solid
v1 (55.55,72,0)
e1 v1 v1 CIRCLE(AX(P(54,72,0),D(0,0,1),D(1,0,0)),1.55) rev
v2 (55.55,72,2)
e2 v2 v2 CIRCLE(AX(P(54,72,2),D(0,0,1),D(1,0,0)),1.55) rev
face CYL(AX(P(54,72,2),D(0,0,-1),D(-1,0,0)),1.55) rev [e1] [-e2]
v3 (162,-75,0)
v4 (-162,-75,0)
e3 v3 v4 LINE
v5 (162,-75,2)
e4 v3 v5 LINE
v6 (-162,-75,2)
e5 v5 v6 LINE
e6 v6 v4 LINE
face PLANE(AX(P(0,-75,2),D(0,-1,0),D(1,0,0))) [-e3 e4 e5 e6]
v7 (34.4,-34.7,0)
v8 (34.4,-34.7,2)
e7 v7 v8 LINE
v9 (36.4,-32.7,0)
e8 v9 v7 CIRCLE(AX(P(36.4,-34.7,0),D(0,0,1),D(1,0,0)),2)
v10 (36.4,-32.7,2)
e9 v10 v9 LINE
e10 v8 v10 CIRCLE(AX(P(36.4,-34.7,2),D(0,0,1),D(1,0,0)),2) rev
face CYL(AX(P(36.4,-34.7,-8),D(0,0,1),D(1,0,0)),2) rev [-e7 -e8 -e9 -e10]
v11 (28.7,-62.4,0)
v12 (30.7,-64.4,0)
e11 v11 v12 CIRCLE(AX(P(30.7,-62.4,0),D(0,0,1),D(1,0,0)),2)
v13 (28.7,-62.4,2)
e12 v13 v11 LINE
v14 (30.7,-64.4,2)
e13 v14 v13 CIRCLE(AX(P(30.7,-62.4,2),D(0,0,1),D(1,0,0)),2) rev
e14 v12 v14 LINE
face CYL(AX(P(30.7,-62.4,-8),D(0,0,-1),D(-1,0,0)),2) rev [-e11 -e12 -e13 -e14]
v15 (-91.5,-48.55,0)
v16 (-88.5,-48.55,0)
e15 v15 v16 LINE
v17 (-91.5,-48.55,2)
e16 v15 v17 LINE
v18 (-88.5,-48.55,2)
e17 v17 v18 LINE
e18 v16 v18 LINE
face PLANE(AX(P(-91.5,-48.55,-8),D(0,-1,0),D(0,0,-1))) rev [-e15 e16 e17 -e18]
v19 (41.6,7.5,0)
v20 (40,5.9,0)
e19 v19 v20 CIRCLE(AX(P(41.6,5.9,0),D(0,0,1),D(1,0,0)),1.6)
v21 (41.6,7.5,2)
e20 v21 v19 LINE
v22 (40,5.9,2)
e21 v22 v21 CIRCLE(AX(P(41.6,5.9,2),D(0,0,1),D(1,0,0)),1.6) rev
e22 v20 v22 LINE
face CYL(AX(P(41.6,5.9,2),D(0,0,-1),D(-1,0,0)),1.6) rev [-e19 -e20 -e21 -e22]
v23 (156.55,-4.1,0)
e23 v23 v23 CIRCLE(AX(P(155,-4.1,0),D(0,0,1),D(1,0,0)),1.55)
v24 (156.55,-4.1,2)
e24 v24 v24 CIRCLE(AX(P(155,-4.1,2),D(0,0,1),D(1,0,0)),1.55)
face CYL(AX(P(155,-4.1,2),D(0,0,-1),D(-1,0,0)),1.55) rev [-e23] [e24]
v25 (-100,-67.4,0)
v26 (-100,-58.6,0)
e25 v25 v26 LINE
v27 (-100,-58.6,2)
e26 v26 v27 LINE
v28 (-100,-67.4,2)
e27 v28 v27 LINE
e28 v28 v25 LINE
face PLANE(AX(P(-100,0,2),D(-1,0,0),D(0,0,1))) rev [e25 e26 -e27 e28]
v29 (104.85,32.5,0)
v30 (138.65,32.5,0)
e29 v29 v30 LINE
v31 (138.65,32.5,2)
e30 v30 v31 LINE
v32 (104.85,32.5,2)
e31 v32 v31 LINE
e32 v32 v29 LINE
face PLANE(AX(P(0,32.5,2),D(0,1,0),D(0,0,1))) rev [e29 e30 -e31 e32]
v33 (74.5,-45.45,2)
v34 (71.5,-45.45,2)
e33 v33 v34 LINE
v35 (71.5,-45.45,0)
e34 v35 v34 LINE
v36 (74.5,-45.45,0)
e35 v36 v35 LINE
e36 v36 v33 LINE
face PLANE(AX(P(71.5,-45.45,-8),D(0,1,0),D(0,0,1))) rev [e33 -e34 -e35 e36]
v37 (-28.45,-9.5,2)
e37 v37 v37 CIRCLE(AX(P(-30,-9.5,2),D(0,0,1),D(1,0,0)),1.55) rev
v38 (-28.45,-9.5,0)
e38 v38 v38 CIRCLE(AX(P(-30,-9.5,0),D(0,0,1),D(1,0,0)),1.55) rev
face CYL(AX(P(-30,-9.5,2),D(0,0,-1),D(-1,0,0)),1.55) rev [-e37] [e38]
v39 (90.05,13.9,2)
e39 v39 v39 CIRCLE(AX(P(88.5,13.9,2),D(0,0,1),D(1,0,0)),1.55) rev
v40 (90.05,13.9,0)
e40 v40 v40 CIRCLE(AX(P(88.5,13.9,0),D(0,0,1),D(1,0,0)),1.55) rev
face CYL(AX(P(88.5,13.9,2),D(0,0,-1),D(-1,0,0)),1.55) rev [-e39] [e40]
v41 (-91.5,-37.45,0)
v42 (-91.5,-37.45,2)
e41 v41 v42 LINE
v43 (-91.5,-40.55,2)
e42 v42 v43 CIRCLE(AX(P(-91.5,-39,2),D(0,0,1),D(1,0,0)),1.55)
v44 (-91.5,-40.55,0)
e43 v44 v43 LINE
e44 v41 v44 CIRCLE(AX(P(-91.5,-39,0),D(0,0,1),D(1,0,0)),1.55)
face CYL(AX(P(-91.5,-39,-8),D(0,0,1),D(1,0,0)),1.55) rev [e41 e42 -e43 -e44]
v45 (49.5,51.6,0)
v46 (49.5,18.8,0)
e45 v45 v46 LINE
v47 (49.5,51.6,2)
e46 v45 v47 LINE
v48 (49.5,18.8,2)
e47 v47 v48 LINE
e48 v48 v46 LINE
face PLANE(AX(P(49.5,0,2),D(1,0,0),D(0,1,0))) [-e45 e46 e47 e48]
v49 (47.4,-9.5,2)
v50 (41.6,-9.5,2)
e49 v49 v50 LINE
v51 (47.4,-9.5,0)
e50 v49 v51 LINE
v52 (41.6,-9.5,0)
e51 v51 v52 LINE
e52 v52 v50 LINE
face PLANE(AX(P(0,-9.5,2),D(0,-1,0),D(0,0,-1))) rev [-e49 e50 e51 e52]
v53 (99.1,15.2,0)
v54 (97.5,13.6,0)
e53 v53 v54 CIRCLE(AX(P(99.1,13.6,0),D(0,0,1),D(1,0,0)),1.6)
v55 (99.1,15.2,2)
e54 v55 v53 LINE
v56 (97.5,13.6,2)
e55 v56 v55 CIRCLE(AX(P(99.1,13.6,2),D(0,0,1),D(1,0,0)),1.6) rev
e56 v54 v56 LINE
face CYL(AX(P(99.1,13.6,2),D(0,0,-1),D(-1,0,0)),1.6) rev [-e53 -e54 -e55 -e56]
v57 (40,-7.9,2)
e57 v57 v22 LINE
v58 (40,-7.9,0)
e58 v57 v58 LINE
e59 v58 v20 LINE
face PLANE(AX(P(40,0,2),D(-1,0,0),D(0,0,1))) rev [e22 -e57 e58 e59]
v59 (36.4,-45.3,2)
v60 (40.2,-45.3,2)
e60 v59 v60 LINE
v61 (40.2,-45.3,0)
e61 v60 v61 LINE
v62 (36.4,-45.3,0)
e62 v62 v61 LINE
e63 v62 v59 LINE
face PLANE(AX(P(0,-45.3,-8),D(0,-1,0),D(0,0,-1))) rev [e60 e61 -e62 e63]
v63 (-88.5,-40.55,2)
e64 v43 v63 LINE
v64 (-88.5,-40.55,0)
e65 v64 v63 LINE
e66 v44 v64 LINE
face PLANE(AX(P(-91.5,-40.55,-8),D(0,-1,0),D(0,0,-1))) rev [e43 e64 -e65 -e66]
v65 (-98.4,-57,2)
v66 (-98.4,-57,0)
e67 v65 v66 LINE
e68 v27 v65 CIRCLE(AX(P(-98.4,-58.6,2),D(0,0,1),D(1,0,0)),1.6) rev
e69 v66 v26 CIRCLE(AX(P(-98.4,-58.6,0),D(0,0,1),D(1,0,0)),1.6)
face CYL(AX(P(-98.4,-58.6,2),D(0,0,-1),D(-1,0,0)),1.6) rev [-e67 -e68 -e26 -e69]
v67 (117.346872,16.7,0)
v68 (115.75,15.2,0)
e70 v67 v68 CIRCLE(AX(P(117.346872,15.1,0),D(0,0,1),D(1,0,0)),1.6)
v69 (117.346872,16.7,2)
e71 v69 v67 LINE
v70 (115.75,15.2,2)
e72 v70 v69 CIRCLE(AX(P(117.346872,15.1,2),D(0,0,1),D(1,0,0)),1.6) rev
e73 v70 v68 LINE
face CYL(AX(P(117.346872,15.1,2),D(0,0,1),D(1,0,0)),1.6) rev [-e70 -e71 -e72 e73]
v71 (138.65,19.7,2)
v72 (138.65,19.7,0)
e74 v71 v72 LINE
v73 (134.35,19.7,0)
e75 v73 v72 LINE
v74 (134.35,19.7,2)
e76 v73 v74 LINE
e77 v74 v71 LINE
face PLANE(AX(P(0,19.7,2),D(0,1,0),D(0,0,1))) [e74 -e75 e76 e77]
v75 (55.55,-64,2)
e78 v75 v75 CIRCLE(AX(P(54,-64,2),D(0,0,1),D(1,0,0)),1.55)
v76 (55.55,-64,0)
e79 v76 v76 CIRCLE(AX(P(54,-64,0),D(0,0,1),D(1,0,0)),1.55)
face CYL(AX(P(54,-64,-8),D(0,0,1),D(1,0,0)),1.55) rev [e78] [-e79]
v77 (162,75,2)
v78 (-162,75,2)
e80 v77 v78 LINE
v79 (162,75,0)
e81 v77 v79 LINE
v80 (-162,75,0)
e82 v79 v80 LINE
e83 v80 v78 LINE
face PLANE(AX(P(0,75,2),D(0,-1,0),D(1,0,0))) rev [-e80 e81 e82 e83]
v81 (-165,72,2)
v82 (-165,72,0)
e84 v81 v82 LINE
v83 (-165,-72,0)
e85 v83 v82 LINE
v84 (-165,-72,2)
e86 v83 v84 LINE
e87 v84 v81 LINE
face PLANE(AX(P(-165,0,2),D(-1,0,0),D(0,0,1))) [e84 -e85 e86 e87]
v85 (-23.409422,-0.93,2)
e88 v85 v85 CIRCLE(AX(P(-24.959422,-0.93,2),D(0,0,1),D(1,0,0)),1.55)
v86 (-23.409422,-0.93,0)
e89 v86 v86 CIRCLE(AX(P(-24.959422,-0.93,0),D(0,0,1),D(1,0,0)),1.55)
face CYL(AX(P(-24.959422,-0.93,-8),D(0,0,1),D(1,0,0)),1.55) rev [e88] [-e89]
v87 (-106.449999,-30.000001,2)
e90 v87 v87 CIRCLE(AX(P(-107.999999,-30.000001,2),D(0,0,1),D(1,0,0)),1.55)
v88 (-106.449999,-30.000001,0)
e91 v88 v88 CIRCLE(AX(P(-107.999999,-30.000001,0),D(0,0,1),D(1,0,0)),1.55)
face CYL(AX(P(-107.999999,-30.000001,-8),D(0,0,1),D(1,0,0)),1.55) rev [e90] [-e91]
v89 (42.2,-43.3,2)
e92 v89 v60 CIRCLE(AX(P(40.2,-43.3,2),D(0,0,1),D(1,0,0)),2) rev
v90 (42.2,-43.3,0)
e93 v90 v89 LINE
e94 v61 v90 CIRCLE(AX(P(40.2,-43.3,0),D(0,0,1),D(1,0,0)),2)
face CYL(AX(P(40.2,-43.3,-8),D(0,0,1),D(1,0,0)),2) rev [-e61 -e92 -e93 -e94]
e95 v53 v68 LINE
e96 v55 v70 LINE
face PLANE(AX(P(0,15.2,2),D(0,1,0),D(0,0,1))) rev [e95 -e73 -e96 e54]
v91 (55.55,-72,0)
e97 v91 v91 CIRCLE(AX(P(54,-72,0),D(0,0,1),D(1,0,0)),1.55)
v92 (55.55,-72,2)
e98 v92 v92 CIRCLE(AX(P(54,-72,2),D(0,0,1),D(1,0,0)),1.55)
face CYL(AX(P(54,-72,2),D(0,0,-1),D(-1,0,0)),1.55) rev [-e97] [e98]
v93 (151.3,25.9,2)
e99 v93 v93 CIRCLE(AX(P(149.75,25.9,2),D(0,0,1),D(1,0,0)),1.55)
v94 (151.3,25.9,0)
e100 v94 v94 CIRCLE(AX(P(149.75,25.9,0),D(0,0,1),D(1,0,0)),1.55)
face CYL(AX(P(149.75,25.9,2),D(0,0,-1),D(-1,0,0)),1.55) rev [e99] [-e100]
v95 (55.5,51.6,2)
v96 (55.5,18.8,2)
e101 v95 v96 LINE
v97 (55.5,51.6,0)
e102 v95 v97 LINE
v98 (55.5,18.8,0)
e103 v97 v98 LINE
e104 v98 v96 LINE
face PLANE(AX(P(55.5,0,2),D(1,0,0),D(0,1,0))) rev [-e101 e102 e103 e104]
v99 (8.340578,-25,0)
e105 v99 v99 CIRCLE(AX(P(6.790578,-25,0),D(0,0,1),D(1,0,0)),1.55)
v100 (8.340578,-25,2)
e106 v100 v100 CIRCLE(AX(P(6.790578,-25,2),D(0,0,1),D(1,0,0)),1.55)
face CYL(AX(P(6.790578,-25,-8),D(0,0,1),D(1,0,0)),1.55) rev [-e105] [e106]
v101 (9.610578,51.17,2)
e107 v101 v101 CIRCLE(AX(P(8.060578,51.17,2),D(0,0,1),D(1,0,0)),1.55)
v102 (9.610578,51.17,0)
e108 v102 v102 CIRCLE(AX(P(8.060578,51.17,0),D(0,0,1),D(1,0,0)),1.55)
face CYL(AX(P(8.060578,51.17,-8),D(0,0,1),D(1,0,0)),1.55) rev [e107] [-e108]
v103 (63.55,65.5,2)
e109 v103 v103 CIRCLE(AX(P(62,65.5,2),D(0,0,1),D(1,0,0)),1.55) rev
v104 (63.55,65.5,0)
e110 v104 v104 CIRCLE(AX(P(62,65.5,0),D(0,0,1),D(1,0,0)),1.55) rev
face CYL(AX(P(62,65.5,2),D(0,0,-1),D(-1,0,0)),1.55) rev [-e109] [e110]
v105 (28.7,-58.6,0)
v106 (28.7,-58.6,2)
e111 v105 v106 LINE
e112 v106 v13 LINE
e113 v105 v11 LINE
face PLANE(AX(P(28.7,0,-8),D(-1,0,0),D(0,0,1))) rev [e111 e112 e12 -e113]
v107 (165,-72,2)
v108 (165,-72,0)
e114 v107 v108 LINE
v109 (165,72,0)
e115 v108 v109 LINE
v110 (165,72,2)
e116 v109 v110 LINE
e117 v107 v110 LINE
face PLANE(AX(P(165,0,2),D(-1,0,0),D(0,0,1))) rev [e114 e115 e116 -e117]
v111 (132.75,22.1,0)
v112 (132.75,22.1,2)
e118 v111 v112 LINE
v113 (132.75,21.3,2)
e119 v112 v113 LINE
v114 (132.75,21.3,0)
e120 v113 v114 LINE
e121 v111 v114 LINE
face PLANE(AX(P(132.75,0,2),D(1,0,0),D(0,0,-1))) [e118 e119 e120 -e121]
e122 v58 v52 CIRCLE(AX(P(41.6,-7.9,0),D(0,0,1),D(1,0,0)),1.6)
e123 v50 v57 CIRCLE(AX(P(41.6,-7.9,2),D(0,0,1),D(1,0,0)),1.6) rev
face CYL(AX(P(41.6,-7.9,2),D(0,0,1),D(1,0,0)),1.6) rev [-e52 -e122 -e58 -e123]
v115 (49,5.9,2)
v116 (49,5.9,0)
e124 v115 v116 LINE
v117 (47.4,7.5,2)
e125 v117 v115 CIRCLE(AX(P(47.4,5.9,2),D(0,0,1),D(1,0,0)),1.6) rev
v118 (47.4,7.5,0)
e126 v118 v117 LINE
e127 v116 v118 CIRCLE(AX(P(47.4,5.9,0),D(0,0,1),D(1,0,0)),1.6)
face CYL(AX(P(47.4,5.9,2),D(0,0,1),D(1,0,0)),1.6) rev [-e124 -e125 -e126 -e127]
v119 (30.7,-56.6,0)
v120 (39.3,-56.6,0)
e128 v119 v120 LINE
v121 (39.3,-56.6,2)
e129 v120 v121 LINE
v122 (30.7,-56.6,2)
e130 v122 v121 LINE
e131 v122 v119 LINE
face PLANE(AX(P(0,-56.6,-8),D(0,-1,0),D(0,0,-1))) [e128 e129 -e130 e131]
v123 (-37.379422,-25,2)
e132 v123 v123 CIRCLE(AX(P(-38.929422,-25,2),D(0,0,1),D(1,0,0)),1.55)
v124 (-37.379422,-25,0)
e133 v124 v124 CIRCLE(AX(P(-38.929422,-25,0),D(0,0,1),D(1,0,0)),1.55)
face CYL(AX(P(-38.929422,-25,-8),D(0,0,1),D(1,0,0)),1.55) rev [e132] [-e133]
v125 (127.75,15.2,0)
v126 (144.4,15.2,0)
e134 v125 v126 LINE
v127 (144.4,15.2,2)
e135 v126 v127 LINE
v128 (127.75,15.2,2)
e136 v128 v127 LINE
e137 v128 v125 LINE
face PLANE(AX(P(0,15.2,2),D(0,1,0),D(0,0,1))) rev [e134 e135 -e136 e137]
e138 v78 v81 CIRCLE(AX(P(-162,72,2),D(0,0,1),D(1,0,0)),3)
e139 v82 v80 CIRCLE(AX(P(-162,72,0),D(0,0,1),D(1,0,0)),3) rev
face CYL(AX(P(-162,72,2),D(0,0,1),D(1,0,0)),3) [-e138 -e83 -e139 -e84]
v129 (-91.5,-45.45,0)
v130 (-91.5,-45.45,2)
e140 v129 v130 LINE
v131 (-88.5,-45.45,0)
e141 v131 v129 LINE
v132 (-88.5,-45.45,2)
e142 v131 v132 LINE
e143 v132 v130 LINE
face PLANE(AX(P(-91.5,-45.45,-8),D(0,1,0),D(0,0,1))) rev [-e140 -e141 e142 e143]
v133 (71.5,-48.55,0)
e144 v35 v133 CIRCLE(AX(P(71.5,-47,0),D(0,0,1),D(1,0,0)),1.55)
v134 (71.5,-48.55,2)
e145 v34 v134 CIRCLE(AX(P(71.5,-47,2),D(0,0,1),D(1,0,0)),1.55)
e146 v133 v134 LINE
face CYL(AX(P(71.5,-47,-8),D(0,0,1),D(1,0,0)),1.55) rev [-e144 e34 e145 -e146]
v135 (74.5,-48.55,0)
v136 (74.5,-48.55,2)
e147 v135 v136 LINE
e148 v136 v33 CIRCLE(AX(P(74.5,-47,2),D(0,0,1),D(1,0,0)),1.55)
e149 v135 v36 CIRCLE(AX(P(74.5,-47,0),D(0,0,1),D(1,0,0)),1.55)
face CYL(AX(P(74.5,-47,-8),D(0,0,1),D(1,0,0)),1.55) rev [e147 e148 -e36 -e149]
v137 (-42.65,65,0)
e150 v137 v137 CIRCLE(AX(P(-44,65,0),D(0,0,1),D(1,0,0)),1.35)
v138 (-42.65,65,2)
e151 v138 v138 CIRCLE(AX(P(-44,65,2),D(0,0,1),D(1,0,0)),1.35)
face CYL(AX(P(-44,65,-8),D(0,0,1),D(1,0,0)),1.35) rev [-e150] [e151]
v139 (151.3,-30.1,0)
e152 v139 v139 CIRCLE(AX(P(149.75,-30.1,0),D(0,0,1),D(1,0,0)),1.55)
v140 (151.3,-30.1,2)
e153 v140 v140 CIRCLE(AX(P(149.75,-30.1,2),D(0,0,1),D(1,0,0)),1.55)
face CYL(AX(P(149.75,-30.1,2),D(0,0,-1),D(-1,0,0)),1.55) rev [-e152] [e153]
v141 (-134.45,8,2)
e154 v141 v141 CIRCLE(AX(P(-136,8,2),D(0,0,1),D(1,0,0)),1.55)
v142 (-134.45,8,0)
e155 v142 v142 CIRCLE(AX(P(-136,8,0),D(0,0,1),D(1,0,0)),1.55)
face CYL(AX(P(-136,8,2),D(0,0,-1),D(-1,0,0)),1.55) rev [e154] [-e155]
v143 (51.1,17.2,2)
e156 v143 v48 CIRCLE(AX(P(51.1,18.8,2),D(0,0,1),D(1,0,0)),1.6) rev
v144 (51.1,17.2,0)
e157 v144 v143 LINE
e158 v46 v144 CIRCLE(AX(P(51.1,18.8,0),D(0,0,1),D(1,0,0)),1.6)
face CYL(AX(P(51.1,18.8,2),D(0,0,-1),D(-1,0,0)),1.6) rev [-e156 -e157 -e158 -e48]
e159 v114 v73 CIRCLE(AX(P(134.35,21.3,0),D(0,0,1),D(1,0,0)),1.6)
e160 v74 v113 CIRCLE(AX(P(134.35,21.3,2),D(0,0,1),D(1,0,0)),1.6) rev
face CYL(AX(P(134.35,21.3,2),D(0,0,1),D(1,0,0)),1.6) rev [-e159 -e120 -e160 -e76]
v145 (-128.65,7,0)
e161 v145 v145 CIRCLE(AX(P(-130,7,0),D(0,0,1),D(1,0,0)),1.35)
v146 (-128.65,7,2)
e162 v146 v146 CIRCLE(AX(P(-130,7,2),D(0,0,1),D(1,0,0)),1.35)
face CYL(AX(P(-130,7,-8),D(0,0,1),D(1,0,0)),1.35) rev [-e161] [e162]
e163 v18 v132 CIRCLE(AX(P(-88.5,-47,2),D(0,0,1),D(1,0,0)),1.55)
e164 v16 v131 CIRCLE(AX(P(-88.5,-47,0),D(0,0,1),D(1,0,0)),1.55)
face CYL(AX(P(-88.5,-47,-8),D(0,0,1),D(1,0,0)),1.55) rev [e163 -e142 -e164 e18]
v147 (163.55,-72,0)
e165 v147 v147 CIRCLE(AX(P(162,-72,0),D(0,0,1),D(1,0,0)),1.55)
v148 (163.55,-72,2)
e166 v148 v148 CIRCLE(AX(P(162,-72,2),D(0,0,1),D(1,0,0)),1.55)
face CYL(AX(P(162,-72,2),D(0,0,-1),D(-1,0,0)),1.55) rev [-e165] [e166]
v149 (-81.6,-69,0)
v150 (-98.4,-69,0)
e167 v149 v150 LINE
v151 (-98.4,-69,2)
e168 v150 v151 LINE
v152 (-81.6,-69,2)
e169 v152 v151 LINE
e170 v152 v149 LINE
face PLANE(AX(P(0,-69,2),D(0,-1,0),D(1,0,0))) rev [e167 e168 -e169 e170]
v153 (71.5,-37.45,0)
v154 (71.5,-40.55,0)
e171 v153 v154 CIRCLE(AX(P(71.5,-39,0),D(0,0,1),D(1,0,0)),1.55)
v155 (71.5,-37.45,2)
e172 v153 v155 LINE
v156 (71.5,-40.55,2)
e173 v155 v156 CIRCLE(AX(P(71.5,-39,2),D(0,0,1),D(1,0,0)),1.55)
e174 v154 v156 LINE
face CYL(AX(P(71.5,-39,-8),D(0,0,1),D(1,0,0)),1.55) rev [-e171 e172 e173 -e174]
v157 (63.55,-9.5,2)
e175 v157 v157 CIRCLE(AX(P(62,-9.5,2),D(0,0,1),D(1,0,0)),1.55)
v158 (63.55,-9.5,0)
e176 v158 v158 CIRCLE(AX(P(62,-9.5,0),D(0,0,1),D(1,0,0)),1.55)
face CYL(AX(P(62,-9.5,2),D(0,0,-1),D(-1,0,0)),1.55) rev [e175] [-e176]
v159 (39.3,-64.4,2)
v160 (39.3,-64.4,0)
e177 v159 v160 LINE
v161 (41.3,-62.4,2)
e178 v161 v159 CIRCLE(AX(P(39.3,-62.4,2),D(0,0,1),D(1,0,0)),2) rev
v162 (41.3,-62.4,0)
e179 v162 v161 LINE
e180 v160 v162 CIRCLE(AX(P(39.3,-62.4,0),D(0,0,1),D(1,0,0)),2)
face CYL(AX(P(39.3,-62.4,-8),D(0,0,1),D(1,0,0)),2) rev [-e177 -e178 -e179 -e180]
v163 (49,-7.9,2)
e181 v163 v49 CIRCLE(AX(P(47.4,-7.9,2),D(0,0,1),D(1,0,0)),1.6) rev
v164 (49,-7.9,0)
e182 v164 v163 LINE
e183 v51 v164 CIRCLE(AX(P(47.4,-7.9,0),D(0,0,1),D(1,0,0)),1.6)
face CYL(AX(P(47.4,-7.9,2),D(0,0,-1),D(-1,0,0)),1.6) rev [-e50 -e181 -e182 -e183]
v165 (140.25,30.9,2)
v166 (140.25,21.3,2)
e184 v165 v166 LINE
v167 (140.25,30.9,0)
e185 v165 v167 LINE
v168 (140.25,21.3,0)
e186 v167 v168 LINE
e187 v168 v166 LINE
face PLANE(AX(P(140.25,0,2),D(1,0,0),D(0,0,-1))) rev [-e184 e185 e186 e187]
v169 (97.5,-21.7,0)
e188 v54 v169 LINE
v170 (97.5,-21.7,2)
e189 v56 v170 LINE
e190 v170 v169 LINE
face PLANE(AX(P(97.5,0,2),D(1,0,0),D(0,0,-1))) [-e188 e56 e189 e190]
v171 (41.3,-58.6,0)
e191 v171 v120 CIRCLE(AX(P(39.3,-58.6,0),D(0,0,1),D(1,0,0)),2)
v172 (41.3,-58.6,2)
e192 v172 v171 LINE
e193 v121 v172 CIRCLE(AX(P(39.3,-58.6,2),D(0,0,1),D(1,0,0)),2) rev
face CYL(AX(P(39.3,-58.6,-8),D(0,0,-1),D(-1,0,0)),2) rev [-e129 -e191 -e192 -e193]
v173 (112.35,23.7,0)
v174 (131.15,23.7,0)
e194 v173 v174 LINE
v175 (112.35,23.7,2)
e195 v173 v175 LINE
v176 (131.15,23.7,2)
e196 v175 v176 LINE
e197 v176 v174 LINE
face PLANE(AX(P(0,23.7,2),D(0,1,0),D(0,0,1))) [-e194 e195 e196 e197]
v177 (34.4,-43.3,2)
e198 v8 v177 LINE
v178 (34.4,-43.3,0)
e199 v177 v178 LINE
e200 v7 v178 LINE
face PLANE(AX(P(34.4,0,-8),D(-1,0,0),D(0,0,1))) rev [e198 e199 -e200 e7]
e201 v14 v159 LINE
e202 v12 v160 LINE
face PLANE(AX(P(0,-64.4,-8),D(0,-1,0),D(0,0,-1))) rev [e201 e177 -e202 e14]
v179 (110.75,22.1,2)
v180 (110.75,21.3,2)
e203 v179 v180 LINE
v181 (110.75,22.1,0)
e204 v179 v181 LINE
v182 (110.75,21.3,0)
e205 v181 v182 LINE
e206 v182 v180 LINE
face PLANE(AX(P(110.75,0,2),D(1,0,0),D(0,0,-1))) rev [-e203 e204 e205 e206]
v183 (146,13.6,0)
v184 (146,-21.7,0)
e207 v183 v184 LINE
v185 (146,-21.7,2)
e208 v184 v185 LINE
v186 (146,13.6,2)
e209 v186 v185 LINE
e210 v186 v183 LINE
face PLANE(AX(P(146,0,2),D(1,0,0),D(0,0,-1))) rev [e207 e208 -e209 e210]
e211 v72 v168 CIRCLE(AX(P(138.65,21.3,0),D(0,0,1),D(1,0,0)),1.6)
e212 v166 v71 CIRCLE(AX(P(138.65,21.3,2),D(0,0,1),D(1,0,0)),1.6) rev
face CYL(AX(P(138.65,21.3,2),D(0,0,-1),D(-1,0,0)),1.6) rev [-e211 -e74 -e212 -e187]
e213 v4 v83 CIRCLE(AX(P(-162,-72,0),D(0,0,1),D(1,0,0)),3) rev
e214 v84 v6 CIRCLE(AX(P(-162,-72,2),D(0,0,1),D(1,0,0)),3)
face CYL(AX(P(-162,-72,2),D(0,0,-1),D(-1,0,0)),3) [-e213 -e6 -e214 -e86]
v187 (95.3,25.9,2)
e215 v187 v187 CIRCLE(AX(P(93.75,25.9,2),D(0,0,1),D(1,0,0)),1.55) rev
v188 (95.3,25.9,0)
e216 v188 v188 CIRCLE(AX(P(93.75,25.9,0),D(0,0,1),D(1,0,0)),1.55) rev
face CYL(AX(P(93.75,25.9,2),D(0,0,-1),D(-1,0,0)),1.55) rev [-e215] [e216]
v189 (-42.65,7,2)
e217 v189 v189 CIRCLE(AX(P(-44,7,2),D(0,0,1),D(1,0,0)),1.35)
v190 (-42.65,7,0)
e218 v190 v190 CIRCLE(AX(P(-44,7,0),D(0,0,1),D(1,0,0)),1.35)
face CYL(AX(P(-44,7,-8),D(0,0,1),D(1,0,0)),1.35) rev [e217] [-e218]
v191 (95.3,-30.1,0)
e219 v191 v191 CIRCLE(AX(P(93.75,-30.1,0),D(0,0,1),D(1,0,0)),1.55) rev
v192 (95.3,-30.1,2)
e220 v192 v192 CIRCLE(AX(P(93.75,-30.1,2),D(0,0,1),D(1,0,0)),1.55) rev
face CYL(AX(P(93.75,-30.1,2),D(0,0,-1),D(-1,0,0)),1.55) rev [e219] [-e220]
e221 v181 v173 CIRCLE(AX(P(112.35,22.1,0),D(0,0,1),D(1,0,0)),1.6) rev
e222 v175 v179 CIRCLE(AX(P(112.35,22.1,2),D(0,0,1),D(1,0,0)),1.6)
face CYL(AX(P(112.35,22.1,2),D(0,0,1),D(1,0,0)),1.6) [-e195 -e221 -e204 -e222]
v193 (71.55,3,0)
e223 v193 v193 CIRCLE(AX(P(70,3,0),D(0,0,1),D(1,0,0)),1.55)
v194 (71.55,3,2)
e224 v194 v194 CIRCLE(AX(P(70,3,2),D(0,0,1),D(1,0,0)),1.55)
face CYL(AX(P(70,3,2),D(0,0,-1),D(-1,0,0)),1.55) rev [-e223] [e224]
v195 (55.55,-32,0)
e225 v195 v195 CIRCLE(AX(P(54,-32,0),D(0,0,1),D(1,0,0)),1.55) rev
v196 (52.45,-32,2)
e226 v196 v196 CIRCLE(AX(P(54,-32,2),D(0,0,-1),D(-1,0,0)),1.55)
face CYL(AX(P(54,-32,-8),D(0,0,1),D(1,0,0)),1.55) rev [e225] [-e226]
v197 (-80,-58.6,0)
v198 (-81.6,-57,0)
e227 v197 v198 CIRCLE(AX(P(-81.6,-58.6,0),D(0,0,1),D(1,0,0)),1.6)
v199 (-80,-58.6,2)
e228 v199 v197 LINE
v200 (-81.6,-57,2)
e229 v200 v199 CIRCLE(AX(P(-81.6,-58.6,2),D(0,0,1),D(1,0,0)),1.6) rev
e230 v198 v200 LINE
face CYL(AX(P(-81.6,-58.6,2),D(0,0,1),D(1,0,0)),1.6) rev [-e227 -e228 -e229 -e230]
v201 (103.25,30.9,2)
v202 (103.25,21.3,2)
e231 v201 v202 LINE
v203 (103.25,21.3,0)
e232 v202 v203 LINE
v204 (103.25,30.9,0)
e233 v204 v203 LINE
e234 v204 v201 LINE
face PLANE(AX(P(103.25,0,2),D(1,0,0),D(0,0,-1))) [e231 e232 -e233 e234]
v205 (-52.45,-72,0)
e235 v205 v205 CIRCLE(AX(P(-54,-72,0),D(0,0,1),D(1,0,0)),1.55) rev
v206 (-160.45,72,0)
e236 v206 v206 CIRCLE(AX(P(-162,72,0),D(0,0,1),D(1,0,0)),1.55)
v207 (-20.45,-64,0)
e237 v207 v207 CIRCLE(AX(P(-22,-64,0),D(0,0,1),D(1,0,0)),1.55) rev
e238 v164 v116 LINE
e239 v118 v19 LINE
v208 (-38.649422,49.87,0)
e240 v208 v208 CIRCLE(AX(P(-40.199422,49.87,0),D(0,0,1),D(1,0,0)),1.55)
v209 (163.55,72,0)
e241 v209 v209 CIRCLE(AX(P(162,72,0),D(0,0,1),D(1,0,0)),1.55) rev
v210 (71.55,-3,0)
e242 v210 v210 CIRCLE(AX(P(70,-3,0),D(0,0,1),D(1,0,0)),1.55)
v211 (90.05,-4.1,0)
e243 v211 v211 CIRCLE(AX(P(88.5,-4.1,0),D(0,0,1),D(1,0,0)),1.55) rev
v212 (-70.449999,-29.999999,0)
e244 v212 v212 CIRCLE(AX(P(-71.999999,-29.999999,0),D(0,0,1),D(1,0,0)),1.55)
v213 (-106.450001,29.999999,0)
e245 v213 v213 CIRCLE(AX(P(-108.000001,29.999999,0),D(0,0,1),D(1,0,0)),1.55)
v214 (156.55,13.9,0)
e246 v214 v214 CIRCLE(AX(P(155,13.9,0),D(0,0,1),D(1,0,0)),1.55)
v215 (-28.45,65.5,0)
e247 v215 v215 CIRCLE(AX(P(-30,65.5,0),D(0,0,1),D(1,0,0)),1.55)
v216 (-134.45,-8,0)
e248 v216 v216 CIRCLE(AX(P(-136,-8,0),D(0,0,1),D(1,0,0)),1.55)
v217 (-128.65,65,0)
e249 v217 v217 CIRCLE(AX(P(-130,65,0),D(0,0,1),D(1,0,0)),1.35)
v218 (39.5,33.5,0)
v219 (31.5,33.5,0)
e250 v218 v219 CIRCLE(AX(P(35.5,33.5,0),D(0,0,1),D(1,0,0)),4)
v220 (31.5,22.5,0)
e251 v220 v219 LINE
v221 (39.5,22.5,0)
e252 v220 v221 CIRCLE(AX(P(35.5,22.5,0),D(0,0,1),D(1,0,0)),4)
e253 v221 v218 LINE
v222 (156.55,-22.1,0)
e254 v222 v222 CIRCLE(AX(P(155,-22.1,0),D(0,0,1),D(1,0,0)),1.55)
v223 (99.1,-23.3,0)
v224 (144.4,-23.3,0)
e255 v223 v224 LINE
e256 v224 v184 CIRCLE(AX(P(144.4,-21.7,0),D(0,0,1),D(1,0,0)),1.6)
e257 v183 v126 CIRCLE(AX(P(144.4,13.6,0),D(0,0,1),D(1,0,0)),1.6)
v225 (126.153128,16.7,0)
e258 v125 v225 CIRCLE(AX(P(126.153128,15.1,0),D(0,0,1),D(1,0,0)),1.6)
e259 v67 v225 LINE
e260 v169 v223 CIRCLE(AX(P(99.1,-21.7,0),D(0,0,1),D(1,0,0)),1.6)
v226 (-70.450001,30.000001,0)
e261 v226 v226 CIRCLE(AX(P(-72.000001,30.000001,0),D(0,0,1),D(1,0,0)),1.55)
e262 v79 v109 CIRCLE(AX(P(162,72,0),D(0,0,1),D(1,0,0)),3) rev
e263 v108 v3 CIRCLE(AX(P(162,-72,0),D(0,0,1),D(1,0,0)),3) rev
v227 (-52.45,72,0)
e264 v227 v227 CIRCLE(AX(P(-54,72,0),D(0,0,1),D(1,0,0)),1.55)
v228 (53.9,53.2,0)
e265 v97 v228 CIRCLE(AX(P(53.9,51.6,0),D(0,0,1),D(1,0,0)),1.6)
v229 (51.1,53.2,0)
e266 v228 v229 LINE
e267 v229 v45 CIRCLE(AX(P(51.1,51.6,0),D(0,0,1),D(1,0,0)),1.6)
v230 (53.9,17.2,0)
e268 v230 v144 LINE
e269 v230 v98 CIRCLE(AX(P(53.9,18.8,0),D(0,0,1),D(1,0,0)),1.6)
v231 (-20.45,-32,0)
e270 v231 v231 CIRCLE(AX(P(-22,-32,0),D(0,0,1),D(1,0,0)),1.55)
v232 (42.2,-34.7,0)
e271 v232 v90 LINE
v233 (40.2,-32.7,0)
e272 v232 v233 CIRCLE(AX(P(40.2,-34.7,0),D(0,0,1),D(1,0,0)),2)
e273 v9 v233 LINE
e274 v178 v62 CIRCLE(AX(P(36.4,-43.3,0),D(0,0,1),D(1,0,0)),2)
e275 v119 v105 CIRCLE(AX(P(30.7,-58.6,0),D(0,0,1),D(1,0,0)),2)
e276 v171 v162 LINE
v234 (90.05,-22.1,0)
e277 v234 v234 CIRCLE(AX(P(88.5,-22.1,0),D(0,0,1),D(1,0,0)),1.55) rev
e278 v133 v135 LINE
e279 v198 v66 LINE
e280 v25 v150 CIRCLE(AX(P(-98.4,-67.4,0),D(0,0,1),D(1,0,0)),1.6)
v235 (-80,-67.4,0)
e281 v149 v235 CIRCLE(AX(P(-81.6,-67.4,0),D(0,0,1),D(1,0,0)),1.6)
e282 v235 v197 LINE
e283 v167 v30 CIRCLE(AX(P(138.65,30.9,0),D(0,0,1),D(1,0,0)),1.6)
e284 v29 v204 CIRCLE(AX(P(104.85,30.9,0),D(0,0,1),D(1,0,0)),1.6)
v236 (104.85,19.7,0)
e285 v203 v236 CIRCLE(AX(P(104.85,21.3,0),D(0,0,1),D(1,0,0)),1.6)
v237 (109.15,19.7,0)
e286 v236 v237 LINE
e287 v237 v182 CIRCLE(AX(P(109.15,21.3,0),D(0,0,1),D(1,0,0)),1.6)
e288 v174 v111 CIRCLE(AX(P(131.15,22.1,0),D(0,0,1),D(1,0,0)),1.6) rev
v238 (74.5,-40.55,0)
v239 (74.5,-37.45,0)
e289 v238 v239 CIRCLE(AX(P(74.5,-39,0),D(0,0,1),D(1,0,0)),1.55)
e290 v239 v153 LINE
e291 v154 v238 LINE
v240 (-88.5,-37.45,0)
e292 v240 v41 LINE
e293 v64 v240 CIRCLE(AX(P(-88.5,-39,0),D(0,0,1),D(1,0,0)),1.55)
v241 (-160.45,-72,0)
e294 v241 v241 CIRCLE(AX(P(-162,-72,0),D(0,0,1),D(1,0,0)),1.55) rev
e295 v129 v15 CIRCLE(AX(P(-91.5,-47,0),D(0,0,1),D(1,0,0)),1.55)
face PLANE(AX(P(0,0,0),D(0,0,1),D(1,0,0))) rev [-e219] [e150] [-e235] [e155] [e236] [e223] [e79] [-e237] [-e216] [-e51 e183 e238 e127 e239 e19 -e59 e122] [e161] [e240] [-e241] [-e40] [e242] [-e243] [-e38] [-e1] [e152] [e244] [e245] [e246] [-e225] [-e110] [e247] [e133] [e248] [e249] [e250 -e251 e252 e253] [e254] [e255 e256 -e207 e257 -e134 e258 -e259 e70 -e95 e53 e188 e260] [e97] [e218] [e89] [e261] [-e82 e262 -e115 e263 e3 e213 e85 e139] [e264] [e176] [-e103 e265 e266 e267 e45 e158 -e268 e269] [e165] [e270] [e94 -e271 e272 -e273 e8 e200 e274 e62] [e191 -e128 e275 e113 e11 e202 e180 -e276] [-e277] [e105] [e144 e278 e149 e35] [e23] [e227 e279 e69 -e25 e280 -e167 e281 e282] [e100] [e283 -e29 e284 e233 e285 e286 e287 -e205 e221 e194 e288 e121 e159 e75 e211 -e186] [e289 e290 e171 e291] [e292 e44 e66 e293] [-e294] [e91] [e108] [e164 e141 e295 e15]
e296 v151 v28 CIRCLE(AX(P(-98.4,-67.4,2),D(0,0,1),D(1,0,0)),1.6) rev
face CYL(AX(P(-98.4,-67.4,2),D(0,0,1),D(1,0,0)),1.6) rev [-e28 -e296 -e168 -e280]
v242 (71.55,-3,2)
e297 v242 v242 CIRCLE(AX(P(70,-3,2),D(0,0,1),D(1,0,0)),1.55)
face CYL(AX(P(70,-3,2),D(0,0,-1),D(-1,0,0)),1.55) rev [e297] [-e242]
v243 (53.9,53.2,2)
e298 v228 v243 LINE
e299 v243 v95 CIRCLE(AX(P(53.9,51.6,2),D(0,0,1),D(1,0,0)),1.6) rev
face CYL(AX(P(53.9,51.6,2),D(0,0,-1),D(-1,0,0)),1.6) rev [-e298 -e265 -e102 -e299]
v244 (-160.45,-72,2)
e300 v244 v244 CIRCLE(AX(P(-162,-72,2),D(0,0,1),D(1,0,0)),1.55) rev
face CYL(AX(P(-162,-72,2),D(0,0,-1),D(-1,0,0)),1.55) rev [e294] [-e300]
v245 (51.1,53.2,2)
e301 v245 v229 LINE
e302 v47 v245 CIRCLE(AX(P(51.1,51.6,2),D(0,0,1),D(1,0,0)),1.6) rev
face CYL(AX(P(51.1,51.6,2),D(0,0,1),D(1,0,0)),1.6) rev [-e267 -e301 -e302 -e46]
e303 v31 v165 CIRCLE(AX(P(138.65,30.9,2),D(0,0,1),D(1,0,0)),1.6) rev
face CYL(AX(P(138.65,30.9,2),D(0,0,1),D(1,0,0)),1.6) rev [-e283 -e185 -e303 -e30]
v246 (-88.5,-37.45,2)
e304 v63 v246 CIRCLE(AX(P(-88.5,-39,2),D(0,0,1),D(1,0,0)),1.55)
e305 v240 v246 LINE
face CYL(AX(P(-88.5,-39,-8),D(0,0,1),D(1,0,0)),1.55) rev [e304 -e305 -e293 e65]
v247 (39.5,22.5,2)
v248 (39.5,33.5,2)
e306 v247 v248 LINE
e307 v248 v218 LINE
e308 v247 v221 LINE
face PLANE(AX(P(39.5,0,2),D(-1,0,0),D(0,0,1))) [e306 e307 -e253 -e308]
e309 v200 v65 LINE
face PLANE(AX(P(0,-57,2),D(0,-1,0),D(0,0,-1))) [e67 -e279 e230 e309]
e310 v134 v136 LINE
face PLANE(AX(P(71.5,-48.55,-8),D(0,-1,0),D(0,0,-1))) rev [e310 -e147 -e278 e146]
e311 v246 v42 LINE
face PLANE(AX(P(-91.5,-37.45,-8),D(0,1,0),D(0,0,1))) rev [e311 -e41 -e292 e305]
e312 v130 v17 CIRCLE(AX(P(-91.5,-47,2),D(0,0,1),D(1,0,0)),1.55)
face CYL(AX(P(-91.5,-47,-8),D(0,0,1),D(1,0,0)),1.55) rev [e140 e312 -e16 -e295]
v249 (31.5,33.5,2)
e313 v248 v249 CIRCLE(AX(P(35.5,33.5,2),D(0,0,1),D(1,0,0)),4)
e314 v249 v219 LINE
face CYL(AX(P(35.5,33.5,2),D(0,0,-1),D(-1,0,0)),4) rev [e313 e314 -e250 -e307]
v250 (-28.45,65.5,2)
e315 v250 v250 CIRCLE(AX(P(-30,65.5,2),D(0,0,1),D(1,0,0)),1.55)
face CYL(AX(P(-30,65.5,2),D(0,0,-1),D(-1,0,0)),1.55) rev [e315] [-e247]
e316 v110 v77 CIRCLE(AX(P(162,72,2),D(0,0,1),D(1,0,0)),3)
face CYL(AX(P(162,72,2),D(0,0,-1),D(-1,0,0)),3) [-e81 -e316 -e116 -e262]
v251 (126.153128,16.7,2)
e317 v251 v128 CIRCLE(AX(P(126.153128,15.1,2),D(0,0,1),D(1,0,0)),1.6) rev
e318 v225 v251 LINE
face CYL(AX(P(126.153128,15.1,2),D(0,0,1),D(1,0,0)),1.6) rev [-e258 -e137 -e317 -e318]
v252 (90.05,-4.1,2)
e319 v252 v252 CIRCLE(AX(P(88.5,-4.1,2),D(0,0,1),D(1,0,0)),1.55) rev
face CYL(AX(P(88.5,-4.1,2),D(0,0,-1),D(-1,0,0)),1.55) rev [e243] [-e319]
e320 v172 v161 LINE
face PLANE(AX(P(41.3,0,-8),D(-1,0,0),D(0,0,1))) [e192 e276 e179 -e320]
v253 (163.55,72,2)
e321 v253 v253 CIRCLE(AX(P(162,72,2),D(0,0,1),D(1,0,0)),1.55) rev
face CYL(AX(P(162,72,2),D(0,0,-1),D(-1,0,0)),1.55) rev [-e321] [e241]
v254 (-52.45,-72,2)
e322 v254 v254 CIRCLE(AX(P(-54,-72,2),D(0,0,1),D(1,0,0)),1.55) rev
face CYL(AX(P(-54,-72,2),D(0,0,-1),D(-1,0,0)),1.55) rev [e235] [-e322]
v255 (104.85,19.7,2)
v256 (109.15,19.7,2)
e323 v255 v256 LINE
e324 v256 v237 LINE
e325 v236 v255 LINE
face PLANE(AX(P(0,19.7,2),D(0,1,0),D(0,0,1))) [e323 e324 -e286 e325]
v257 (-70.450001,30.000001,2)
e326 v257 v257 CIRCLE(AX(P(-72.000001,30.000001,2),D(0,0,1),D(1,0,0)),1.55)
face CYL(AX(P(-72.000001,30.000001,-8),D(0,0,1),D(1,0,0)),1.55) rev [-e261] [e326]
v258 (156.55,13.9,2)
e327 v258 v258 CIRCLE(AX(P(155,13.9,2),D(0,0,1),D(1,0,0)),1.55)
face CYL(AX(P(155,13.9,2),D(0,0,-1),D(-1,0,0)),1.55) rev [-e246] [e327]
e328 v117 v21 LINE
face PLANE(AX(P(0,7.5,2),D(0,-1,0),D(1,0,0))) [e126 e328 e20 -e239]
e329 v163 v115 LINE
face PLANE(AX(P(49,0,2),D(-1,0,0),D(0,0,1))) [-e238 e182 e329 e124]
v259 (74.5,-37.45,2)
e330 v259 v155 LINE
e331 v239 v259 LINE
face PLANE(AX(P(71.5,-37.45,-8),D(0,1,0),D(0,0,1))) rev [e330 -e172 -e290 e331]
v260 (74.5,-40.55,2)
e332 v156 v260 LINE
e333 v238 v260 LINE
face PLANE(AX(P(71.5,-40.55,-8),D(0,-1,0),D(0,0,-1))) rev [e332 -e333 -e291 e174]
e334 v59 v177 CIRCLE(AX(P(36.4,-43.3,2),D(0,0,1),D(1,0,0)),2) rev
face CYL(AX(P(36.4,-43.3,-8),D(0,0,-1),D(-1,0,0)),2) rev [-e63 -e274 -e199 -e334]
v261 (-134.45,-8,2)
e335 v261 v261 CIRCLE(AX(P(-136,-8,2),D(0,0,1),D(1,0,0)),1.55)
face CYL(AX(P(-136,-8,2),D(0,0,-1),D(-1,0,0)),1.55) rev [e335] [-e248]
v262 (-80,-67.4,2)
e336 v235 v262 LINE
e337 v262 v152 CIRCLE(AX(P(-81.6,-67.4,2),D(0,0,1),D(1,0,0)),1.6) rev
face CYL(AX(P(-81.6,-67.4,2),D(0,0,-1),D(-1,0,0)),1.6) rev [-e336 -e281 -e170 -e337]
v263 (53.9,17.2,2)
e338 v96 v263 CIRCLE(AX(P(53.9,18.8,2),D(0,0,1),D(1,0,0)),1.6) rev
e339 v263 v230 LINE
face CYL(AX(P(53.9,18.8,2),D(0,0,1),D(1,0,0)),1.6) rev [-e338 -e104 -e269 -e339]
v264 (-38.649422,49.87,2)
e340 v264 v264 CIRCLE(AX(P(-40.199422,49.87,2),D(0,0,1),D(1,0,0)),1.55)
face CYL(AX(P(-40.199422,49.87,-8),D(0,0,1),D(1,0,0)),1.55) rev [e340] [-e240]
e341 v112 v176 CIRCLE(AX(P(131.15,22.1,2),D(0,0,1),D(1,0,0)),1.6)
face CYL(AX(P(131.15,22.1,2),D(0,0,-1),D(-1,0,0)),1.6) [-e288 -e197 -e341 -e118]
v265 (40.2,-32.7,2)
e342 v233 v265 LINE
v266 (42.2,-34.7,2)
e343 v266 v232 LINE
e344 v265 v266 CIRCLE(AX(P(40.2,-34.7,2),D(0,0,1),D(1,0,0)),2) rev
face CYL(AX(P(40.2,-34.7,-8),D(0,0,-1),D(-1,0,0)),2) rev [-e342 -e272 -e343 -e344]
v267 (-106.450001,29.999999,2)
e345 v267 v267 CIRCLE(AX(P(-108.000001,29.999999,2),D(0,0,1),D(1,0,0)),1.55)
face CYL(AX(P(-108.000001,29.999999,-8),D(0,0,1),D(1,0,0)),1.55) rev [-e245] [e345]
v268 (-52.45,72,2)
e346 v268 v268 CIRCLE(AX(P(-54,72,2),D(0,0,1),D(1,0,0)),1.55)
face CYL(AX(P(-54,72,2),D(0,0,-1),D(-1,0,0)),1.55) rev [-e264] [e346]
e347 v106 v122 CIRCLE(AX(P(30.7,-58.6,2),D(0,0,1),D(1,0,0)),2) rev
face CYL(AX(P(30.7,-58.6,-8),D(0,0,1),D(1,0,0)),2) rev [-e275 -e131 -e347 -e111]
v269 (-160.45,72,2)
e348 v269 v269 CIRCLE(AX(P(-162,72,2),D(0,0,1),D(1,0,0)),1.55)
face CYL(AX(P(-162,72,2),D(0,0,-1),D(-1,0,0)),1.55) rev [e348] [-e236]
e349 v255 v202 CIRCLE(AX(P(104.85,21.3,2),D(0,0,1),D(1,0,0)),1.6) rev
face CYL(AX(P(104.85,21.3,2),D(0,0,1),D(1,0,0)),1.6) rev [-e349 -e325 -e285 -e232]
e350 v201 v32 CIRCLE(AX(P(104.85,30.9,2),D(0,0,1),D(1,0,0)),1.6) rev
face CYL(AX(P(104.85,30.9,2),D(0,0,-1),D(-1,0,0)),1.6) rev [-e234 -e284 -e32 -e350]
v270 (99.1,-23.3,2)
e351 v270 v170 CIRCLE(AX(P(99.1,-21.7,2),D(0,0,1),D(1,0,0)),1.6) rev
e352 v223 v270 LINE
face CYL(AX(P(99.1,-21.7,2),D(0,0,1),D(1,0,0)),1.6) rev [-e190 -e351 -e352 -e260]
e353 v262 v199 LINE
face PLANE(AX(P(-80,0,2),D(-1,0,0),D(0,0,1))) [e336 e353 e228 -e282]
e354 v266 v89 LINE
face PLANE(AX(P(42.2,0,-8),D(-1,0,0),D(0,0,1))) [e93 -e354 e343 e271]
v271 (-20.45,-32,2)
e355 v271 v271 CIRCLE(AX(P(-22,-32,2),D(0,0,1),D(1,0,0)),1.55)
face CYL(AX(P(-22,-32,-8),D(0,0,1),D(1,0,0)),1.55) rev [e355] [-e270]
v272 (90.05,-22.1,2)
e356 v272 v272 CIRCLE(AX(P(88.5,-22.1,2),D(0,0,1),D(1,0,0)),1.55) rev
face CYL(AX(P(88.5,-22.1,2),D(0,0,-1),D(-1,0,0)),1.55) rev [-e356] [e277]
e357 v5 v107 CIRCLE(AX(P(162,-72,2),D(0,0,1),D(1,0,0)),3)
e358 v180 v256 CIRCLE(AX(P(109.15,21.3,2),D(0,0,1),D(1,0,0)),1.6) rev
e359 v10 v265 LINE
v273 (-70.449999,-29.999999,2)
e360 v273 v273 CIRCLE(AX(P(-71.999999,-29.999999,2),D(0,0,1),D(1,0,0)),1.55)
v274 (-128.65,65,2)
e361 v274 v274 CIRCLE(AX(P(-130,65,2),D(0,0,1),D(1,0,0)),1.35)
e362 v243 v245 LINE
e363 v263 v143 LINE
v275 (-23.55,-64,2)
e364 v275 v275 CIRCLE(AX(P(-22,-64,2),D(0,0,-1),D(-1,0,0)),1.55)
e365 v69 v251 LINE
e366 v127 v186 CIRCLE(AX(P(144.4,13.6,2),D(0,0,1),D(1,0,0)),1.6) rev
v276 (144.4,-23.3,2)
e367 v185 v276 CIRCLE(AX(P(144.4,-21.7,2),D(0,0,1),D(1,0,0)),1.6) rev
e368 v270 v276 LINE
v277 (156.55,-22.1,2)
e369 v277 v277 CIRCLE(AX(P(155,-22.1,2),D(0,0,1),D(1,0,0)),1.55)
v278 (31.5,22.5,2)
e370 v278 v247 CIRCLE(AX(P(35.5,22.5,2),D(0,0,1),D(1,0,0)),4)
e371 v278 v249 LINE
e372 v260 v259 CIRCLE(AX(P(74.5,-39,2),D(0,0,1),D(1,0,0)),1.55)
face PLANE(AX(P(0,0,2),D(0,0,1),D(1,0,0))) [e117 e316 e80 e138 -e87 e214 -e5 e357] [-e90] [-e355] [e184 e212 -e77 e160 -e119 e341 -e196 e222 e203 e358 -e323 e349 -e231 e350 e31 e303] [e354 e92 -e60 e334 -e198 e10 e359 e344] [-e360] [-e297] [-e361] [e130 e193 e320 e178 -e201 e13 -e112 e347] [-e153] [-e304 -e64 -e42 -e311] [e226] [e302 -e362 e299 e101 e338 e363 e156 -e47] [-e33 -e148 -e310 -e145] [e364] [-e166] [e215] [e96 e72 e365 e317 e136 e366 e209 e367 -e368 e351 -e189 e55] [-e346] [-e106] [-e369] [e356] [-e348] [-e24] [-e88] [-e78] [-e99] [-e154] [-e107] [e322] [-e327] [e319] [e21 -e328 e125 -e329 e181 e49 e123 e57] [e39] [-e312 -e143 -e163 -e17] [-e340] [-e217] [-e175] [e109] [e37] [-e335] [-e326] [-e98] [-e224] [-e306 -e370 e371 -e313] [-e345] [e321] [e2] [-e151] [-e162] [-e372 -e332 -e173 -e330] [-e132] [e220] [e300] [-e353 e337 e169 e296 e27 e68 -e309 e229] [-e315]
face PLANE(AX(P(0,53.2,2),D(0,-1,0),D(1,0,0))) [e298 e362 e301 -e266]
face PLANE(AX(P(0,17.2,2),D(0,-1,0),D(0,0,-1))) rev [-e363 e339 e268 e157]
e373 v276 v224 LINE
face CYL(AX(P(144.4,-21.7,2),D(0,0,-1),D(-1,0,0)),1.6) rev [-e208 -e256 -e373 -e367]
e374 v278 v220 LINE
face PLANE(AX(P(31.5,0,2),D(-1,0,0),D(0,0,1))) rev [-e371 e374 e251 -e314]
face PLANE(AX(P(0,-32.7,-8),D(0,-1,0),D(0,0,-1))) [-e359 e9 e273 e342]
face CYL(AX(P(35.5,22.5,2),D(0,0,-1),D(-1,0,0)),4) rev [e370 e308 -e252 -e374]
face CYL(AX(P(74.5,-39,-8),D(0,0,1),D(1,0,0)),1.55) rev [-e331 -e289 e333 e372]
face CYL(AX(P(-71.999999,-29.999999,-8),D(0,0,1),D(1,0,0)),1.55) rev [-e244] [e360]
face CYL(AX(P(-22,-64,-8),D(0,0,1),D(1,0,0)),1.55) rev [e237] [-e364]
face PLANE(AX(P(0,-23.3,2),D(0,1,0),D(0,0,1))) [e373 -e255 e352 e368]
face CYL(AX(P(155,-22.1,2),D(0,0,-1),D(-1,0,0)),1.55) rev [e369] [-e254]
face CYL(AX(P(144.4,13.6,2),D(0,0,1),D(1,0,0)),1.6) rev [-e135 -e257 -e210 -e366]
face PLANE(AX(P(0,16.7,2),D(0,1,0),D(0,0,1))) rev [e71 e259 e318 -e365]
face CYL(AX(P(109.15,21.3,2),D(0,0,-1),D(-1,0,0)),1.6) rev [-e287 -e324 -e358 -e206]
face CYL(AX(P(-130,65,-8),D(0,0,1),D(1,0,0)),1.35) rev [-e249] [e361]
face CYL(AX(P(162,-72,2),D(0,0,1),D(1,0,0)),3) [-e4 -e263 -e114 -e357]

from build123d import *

# Parameters (mm, degrees)
SKETCH1_W                  = 330
SKETCH1_H                  = 150
SKETCH1_R                  = 1.55
SKETCH1_W_2                = 20
SKETCH1_H_2                = 12
SKETCH1_W_3                = 9
SKETCH1_H_3                = 17
SKETCH1_W_4                = 6
SKETCH1_H_4                = 36
BOSS_EXTRUDE1_DEPTH        = 2
FILLET1_R                  = 3
FILLET2_R                  = 1.6
SKETCH4_R                  = 1.35
JETSON_NANO_DEPTH          = 10
SKETCH5_R                  = 1.55
DCDC19V_AND_MOAB_DEPTH     = 10
SKETCH6_W                  = 12.6
SKETCH6_H                  = 7.8
SKETCH6_W_2                = 7.8
SKETCH6_H_2                = 12.6
SKETCH6_R                  = 1.55
DCDC_5V10A_CASE_HOLE_DEPTH = 10
FILLET3_R                  = 2
WIRING_TIDE_HOLE_DEPTH     = 10


with BuildPart() as part:
    # Sketch1 → Boss-Extrude1 (new body)
    with BuildSketch(Plane.XY):
        Rectangle(SKETCH1_W, SKETCH1_H)
        with Locations((-162, -72)):
            Circle(SKETCH1_R, mode=Mode.SUBTRACT)
        with Locations((-90, -63)):
            Rectangle(SKETCH1_W_2, SKETCH1_H_2, mode=Mode.SUBTRACT)
        with Locations((-54, -72)):
            Circle(SKETCH1_R, mode=Mode.SUBTRACT)
        with Locations((-136, -8)):
            Circle(SKETCH1_R, mode=Mode.SUBTRACT)
        with Locations((-30, -9.5)):
            Circle(SKETCH1_R, mode=Mode.SUBTRACT)
        with Locations((54, -72)):
            Circle(SKETCH1_R, mode=Mode.SUBTRACT)
        with Locations((162, -72)):
            Circle(SKETCH1_R, mode=Mode.SUBTRACT)
        with Locations((62, -9.5)):
            Circle(SKETCH1_R, mode=Mode.SUBTRACT)
        with Locations((44.5, -1)):
            Rectangle(SKETCH1_W_3, SKETCH1_H_3, mode=Mode.SUBTRACT)
        with Locations((70, -3)):
            Circle(SKETCH1_R, mode=Mode.SUBTRACT)
        with Locations((93.75, -30.1)):
            Circle(SKETCH1_R, mode=Mode.SUBTRACT)
        with Locations((88.5, -22.1)):
            Circle(SKETCH1_R, mode=Mode.SUBTRACT)
        with Locations((149.75, -30.1)):
            Circle(SKETCH1_R, mode=Mode.SUBTRACT)
        with Locations((155, -22.1)):
            Circle(SKETCH1_R, mode=Mode.SUBTRACT)
        with Locations((88.5, -4.1)):
            Circle(SKETCH1_R, mode=Mode.SUBTRACT)
        Polygon((97.5, -23.3), (97.5, 15.2), (115.75, 15.2), (115.75, 16.7), (127.75, 16.7), (127.75, 15.2), (146, 15.2), (146, -23.3), align=None, mode=Mode.SUBTRACT)
        with Locations((155, -4.1)):
            Circle(SKETCH1_R, mode=Mode.SUBTRACT)
        with Locations((-136, 8)):
            Circle(SKETCH1_R, mode=Mode.SUBTRACT)
        with Locations((-162, 72)):
            Circle(SKETCH1_R, mode=Mode.SUBTRACT)
        with Locations((-54, 72)):
            Circle(SKETCH1_R, mode=Mode.SUBTRACT)
        with Locations((-30, 65.5)):
            Circle(SKETCH1_R, mode=Mode.SUBTRACT)
        with Locations((70, 3)):
            Circle(SKETCH1_R, mode=Mode.SUBTRACT)
        with BuildLine():
            ThreePointArc((39.5, 22.5), (35.5, 18.5), (31.5, 22.5))
            Line((31.5, 22.5), (31.5, 33.5))
            ThreePointArc((31.5, 33.5), (35.5, 37.5), (39.5, 33.5))
            Line((39.5, 33.5), (39.5, 22.5))
        make_face(mode=Mode.SUBTRACT)
        with Locations((52.5, 35.2)):
            Rectangle(SKETCH1_W_4, SKETCH1_H_4, mode=Mode.SUBTRACT)
        with Locations((88.5, 13.9)):
            Circle(SKETCH1_R, mode=Mode.SUBTRACT)
        with Locations((155, 13.9)):
            Circle(SKETCH1_R, mode=Mode.SUBTRACT)
        with Locations((93.75, 25.9)):
            Circle(SKETCH1_R, mode=Mode.SUBTRACT)
        Polygon((103.25, 19.7), (103.25, 32.5), (140.25, 32.5), (140.25, 19.7), (132.75, 19.7), (132.75, 23.7), (110.75, 23.7), (110.75, 19.7), align=None, mode=Mode.SUBTRACT)
        with Locations((149.75, 25.9)):
            Circle(SKETCH1_R, mode=Mode.SUBTRACT)
        with Locations((54, 72)):
            Circle(SKETCH1_R, mode=Mode.SUBTRACT)
        with Locations((62, 65.5)):
            Circle(SKETCH1_R, mode=Mode.SUBTRACT)
        with Locations((162, 72)):
            Circle(SKETCH1_R, mode=Mode.SUBTRACT)
    extrude(amount=BOSS_EXTRUDE1_DEPTH)

    # Fillet1
    fillet1_edges = [part.edges().sort_by_distance(p)[0] for p in [
        (-165, 75, 1),
        (165, 75, 1),
        (165, -75, 1),
        (-165, -75, 1),
    ]]
    fillet(fillet1_edges, radius=FILLET1_R)

    # Fillet2
    # the kernel refuses this fillet: 1.6 mm, written as the material it adds along each edge
    with BuildSketch(Plane(origin=(40, 7.5, 0), x_dir=(1, 0, 0), z_dir=(0, 0, 1)), Plane(origin=(55.5, 53.2, 0), x_dir=(0, -1, 0), z_dir=(0, 0, 1)), Plane(origin=(103.25, 19.7, 0), x_dir=(0, 1, 0), z_dir=(0, 0, 1)), Plane(origin=(-80, -57, 0), x_dir=(0, -1, 0), z_dir=(0, 0, 1)), Plane(origin=(97.5, -23.3, 0), x_dir=(0, 1, 0), z_dir=(0, 0, 1))) as fillet2_piece_1:
        with BuildLine():
            CenterArc((FILLET2_R, -FILLET2_R), FILLET2_R, 90, 90)
            Line((0, -FILLET2_R), (0, 0))
            Line((0, 0), (FILLET2_R, 0))
        make_face()
    extrude(amount=2)
    with BuildSketch(Plane(origin=(40, -9.5, 0), x_dir=(1, 0, 0), z_dir=(0, 0, 1)), Plane(origin=(49, -9.5, 0), x_dir=(0, 1, 0), z_dir=(0, 0, 1)), Plane(origin=(49, 7.5, 0), x_dir=(-1, 0, 0), z_dir=(0, 0, 1)), Plane(origin=(49.5, 17.2, 0), x_dir=(1, 0, 0), z_dir=(0, 0, 1)), Plane(origin=(55.5, 17.2, 0), x_dir=(0, 1, 0), z_dir=(0, 0, 1)), Plane(origin=(49.5, 53.2, 0), x_dir=(0, -1, 0), z_dir=(0, 0, 1)), Plane(origin=(103.25, 32.5, 0), x_dir=(0, -1, 0), z_dir=(0, 0, 1)), Plane(origin=(110.75, 19.7, 0), x_dir=(0, 1, 0), z_dir=(0, 0, 1)), Plane(origin=(132.75, 19.7, 0), x_dir=(1, 0, 0), z_dir=(0, 0, 1)), Plane(origin=(140.25, 19.7, 0), x_dir=(0, 1, 0), z_dir=(0, 0, 1)), Plane(origin=(140.25, 32.5, 0), x_dir=(-1, 0, 0), z_dir=(0, 0, 1)), Plane(origin=(-80, -69, 0), x_dir=(0, 1, 0), z_dir=(0, 0, 1)), Plane(origin=(-100, -57, 0), x_dir=(0, -1, 0), z_dir=(0, 0, 1)), Plane(origin=(-100, -69, 0), x_dir=(1, 0, 0), z_dir=(0, 0, 1)), Plane(origin=(97.5, 15.2, 0), x_dir=(0, -1, 0), z_dir=(0, 0, 1)), Plane(origin=(146, -23.3, 0), x_dir=(0, 1, 0), z_dir=(0, 0, 1)), Plane(origin=(146, 15.2, 0), x_dir=(-1, 0, 0), z_dir=(0, 0, 1))) as fillet2_piece_2:
        with BuildLine():
            CenterArc((FILLET2_R, FILLET2_R), FILLET2_R, 180, 90)
            Line((0, FILLET2_R), (0, 0))
            Line((0, 0), (FILLET2_R, 0))
        make_face()
    extrude(amount=2)
    with BuildSketch(Plane(origin=(115.75, 16.7, 0), x_dir=(0, -1, 0), z_dir=(0, 0, 1))) as fillet2_piece_3:
        with BuildLine():
            CenterArc((1.6, 1.596871942), FILLET2_R, 180, 86.416678302)
            Line((0, 1.596871942), (0, 0))
            Line((0, 0), (1.5, 0))
        make_face()
    extrude(amount=2)
    with BuildSketch(Plane(origin=(127.75, 16.7, 0), x_dir=(-1, 0, 0), z_dir=(0, 0, 1))) as fillet2_piece_4:
        with BuildLine():
            CenterArc((1.596871942, 1.6), FILLET2_R, 183.583321698, 86.416678302)
            Line((0, 1.5), (0, 0))
            Line((0, 0), (1.596871942, 0))
        make_face()
    extrude(amount=2)
    # the kernel refuses this fillet: 1.6 mm, written as the material it takes off along each edge
    with BuildSketch(Plane(origin=(110.75, 23.7, -4), x_dir=(1, 0, 0), z_dir=(0, 0, 1)), Plane(origin=(132.75, 23.7, -4), x_dir=(0, -1, 0), z_dir=(0, 0, 1))) as fillet2_2_piece_1:
        with BuildLine():
            CenterArc((FILLET2_R, -FILLET2_R), FILLET2_R, 90, 90)
            Line((0, -FILLET2_R), (0, 0))
            Line((0, 0), (FILLET2_R, 0))
        make_face()
    extrude(amount=10, mode=Mode.SUBTRACT)

    # Sketch4 → Jetson nano (cut)
    with BuildSketch(Plane.XY.offset(2)):
        with Locations((-130, 65)):
            Circle(SKETCH4_R)
        with Locations((-44, 65)):
            Circle(SKETCH4_R)
        with Locations((-130, 7)):
            Circle(SKETCH4_R)
        with Locations((-44, 7)):
            Circle(SKETCH4_R)
    extrude(amount=-JETSON_NANO_DEPTH, mode=Mode.SUBTRACT)

    # Sketch5 → DCDC19V and MOAB (cut)
    with BuildSketch(Plane.XY.offset(2)):
        with Locations((-107.999998979, -30.000000613)):
            Circle(SKETCH5_R)
        with Locations((-108.000001021, 29.999999387)):
            Circle(SKETCH5_R)
        with Locations((-71.999998979, -29.999999387)):
            Circle(SKETCH5_R)
        with Locations((-72.000001021, 30.000000613)):
            Circle(SKETCH5_R)
        with Locations((-38.929421978, -25)):
            Circle(SKETCH5_R)
        with Locations((6.790578022, -25)):
            Circle(SKETCH5_R)
        with Locations((-24.959421978, -0.93)):
            Circle(SKETCH5_R)
        with Locations((-40.199421978, 49.87)):
            Circle(SKETCH5_R)
        with Locations((8.060578022, 51.17)):
            Circle(SKETCH5_R)
    extrude(amount=-DCDC19V_AND_MOAB_DEPTH, mode=Mode.SUBTRACT)

    # Sketch6 → DCDC 5V10A case hole (cut)
    # profile 1 of 7: a face of its own
    with BuildSketch(Plane.XY.offset(2)):
        with Locations((35, -60.5)):
            Rectangle(SKETCH6_W, SKETCH6_H)
        with BuildLine():
            ThreePointArc((38, -63), (40.5, -60.5), (38, -58))
            Line((38, -58), (32, -58))
            ThreePointArc((32, -58), (29.5, -60.5), (32, -63))
            Line((32, -63), (38, -63))
        make_face(mode=Mode.SUBTRACT)
    # profile 2 of 7: a face of its own
    with BuildSketch(Plane.XY.offset(2)):
        with BuildLine():
            Line((32, -63), (38, -63))
            ThreePointArc((38, -63), (40.5, -60.5), (38, -58))
            Line((38, -58), (32, -58))
            ThreePointArc((32, -58), (29.5, -60.5), (32, -63))
        make_face()
    # profile 3 of 7: a face of its own
    with BuildSketch(Plane.XY.offset(2)):
        with Locations((38.3, -39)):
            Rectangle(SKETCH6_W_2, SKETCH6_H_2)
    # profile 4 of 7: a face of its own
    with BuildSketch(Plane.XY.offset(2)):
        with Locations((54, -32)):
            Circle(SKETCH6_R)
    # profile 5 of 7: a face of its own
    with BuildSketch(Plane.XY.offset(2)):
        with Locations((54, -64)):
            Circle(SKETCH6_R)
    # profile 6 of 7: a face of its own
    with BuildSketch(Plane.XY.offset(2)):
        with Locations((-22, -64)):
            Circle(SKETCH6_R)
    # profile 7 of 7: a face of its own
    with BuildSketch(Plane.XY.offset(2)):
        with Locations((-22, -32)):
            Circle(SKETCH6_R)
    extrude(amount=-DCDC_5V10A_CASE_HOLE_DEPTH, mode=Mode.SUBTRACT)

    # Fillet3
    fillet3_edges = [part.edges().sort_by_distance(p)[0] for p in [
        (34.4, -32.7, 1),
        (42.2, -32.7, 1),
        (42.2, -45.3, 1),
        (34.4, -45.3, 1),
        (41.3, -56.6, 1),
        (41.3, -64.4, 1),
        (28.7, -64.4, 1),
        (28.7, -56.6, 1),
    ]]
    fillet(fillet3_edges, radius=FILLET3_R)

    # Sketch7 → wiring tide hole (cut)
    with BuildSketch(Plane.XY.offset(2)):
        with BuildLine():
            Line((-91.5, -37.45), (-88.5, -37.45))
            ThreePointArc((-88.5, -37.45), (-86.95, -39), (-88.5, -40.55))
            Line((-88.5, -40.55), (-91.5, -40.55))
            ThreePointArc((-91.5, -40.55), (-93.05, -39), (-91.5, -37.45))
        make_face()
        with BuildLine():
            Line((-91.5, -45.45), (-88.5, -45.45))
            ThreePointArc((-88.5, -45.45), (-86.95, -47), (-88.5, -48.55))
            Line((-88.5, -48.55), (-91.5, -48.55))
            ThreePointArc((-91.5, -48.55), (-93.05, -47), (-91.5, -45.45))
        make_face()
        with BuildLine():
            Line((71.5, -37.45), (74.5, -37.45))
            ThreePointArc((74.5, -37.45), (76.05, -39), (74.5, -40.55))
            Line((74.5, -40.55), (71.5, -40.55))
            ThreePointArc((71.5, -40.55), (69.95, -39), (71.5, -37.45))
        make_face()
        with BuildLine():
            Line((71.5, -45.45), (74.5, -45.45))
            ThreePointArc((74.5, -45.45), (76.05, -47), (74.5, -48.55))
            Line((74.5, -48.55), (71.5, -48.55))
            ThreePointArc((71.5, -48.55), (69.95, -47), (71.5, -45.45))
        make_face()
    extrude(amount=-WIRING_TIDE_HOLE_DEPTH, mode=Mode.SUBTRACT)


solid = part.part
